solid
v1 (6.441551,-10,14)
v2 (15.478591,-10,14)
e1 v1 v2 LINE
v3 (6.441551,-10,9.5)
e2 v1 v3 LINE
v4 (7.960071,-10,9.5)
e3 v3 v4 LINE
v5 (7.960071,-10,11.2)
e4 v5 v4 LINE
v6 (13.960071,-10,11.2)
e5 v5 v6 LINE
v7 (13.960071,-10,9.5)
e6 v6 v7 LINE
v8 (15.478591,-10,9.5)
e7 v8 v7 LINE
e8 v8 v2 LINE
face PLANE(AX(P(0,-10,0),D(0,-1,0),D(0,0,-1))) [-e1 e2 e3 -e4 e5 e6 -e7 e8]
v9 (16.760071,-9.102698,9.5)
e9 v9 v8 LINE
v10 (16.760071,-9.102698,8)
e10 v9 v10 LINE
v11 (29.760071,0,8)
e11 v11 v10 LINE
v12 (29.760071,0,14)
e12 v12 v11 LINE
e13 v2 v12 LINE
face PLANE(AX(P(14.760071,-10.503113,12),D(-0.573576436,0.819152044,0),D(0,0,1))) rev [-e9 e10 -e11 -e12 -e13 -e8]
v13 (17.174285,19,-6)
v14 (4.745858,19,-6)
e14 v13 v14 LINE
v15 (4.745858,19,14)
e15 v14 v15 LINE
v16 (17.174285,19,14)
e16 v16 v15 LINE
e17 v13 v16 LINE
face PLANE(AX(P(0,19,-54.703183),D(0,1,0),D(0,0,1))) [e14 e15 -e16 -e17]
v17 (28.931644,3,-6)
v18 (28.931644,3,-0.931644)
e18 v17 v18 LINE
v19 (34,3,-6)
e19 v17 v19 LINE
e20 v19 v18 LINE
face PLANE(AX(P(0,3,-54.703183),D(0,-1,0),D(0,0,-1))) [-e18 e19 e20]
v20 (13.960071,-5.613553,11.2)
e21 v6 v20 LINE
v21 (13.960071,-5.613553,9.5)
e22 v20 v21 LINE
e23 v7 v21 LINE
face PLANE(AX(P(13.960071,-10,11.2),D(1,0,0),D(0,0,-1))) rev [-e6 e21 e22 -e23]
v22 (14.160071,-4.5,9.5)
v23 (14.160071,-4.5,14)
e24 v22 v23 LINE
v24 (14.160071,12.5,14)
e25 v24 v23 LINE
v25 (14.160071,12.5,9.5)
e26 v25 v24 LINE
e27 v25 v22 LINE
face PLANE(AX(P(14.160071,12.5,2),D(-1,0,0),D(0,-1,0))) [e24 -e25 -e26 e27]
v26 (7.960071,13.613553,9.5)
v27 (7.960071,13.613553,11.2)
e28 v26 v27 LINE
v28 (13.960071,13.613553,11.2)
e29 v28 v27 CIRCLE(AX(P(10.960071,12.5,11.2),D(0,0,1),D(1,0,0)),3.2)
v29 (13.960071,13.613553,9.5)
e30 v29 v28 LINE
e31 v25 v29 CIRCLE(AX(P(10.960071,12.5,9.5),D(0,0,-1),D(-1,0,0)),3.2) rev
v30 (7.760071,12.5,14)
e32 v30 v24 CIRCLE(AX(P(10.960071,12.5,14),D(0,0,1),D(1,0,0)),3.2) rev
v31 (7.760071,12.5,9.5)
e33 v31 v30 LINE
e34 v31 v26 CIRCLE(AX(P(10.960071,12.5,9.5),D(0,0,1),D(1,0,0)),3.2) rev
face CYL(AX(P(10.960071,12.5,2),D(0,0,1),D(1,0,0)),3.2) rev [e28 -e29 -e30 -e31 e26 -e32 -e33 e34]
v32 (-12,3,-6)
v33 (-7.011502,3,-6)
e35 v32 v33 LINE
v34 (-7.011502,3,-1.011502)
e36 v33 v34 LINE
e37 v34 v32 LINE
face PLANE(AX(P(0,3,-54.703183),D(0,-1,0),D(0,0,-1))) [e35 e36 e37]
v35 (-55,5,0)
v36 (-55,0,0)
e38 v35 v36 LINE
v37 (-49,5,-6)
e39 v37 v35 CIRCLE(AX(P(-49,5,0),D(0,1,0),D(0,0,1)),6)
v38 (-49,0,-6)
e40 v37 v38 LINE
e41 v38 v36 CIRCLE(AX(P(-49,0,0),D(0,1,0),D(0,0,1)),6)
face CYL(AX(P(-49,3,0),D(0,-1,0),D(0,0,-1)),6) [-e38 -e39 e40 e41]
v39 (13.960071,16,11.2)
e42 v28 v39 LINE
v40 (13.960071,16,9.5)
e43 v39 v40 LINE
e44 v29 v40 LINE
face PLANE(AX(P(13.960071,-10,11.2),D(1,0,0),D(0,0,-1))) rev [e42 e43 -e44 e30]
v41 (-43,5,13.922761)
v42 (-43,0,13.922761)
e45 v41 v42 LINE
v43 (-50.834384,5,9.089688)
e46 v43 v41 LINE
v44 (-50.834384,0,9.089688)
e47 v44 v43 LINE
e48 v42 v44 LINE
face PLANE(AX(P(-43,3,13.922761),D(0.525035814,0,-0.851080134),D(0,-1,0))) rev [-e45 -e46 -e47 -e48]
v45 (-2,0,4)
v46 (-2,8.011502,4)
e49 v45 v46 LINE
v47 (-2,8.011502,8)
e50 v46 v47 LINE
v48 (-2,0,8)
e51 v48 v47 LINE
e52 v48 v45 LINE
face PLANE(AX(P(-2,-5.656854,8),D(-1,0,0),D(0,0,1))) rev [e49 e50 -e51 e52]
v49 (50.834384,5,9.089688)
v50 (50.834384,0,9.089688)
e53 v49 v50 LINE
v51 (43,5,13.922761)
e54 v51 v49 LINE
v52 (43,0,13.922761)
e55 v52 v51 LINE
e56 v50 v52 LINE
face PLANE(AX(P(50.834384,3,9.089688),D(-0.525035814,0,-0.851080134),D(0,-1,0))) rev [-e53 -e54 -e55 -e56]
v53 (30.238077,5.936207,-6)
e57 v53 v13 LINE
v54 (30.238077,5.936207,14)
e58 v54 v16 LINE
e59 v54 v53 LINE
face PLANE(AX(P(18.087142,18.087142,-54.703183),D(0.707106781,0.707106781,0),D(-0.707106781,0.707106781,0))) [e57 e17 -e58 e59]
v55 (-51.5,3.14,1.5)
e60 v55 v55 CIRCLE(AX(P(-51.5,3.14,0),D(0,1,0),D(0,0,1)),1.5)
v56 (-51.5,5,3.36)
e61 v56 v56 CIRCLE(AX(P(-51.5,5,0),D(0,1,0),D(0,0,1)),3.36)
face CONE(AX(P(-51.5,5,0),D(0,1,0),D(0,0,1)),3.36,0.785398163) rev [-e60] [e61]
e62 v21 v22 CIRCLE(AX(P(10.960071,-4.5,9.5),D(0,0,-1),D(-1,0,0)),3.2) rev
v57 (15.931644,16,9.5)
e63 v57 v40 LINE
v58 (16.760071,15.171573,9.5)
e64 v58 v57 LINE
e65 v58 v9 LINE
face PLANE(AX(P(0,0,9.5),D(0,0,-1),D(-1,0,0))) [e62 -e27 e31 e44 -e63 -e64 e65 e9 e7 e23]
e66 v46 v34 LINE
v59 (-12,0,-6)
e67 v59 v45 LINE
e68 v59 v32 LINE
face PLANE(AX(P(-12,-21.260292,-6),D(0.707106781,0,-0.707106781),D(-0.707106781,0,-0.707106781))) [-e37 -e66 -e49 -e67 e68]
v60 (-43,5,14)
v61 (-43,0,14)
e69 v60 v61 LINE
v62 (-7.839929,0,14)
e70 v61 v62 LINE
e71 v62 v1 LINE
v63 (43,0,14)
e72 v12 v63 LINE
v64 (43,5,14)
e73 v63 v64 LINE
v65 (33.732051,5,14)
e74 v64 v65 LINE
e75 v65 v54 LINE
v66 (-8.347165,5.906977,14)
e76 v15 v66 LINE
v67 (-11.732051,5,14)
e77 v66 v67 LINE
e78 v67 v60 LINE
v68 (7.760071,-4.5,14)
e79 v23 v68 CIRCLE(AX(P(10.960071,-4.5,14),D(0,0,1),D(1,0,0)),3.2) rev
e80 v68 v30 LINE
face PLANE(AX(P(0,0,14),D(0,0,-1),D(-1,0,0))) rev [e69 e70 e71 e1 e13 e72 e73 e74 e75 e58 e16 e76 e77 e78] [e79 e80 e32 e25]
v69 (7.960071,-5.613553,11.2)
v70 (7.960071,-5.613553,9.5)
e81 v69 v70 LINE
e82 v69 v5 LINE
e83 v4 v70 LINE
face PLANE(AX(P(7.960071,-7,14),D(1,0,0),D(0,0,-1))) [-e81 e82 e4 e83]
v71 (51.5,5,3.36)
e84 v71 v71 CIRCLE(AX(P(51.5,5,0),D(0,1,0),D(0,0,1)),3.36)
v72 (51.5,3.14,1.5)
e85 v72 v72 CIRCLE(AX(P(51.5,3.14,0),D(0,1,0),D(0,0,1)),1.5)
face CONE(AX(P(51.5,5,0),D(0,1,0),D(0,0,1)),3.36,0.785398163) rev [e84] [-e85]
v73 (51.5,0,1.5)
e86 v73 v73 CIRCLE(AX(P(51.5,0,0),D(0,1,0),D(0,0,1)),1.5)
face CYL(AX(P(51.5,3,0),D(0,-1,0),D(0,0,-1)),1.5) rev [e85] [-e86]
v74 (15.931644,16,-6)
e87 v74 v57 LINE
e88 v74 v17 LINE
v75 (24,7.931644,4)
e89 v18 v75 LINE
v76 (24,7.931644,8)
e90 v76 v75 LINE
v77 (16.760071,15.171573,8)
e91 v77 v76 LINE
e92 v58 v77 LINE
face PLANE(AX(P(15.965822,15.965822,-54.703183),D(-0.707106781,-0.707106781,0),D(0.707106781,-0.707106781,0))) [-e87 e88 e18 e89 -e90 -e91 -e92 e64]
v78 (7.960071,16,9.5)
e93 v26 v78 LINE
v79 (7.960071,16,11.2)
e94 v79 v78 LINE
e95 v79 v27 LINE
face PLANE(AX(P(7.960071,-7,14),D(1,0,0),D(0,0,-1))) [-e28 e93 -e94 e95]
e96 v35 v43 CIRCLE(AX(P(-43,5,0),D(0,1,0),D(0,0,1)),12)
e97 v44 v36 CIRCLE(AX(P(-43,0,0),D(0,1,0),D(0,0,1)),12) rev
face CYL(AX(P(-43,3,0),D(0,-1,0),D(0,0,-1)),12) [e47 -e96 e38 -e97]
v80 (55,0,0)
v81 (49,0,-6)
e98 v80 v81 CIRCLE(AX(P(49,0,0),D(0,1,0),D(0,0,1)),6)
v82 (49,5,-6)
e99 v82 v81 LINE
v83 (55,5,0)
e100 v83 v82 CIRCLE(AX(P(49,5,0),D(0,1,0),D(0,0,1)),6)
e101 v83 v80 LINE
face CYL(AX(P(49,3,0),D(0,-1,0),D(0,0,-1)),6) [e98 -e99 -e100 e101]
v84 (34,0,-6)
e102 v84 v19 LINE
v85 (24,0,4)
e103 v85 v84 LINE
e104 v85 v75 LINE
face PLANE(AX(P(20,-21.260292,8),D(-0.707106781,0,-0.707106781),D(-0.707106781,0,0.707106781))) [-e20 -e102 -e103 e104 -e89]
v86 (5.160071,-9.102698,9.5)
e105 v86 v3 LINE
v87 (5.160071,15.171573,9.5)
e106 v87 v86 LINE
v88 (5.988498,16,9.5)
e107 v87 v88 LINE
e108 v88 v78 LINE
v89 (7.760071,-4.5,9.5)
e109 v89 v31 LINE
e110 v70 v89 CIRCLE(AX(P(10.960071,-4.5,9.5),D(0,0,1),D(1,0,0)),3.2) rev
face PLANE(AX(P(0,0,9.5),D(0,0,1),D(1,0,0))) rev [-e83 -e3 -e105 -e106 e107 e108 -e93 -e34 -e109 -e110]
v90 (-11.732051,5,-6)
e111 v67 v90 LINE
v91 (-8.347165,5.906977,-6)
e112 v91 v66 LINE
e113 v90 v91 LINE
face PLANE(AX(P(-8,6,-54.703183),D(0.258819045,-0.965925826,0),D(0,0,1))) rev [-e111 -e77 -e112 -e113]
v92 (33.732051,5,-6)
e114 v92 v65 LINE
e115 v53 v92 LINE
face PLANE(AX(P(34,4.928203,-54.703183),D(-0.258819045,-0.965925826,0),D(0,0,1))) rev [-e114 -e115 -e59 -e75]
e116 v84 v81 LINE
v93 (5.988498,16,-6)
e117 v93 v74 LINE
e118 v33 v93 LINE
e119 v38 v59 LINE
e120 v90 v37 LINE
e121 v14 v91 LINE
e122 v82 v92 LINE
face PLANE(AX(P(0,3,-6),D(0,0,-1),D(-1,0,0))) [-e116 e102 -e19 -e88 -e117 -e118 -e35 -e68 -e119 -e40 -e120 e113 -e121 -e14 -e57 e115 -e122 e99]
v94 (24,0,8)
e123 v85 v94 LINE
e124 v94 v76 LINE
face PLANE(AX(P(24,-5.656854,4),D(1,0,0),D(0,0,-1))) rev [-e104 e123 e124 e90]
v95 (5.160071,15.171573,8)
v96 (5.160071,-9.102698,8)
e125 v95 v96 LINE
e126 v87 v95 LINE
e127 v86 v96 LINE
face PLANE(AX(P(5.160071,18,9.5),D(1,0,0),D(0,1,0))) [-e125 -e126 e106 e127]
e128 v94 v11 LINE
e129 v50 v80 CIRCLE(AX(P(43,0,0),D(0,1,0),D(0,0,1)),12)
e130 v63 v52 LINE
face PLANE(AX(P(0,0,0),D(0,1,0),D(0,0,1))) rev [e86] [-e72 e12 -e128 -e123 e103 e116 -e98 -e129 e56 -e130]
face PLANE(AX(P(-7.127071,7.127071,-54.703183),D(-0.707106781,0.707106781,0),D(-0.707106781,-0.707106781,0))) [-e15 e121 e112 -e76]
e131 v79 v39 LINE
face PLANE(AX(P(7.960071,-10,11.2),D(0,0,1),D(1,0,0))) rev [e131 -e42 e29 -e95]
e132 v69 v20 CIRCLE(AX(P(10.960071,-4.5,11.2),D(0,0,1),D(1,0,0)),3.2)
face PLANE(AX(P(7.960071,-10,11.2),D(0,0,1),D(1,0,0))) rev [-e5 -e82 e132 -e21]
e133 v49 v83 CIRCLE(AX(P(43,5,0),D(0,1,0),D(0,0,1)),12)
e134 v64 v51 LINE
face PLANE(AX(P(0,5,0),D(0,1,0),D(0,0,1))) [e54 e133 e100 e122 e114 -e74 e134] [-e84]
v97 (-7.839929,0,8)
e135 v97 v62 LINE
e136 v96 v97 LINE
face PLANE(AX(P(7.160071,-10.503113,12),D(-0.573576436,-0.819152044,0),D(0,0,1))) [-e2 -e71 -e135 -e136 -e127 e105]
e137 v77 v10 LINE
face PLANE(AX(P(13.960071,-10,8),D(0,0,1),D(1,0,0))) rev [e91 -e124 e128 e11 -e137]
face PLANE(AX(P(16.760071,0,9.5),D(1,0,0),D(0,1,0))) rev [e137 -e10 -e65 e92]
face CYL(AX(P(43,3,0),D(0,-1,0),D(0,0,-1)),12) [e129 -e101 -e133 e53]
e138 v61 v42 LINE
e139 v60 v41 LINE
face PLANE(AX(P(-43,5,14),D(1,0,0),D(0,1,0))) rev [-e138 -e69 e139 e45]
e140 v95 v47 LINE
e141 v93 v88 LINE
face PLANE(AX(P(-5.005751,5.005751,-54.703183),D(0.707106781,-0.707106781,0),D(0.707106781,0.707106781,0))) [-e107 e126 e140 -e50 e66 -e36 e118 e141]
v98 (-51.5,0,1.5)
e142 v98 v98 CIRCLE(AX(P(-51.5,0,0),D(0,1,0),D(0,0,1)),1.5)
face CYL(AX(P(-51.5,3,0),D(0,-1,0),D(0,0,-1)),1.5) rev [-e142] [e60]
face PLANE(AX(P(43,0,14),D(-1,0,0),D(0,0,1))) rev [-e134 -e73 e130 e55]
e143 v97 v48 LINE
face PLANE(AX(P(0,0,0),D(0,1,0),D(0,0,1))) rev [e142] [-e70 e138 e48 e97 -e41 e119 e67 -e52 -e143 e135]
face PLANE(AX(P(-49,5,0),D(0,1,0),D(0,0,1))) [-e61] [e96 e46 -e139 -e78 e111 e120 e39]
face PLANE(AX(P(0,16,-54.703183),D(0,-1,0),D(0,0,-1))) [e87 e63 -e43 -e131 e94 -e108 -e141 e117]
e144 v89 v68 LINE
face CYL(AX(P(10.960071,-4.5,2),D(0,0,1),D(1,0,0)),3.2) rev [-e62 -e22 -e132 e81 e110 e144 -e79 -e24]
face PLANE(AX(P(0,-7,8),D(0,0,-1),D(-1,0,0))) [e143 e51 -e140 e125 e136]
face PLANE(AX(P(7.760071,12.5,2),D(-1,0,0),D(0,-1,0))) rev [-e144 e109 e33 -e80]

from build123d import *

# Parameters (mm, degrees)
BOSS_EXTRUDE1_DEPTH           = 3
CUT_EXTRUDE1_DEPTH            = 10
CUT_EXTRUDE3_START            = 8
SKETCH8_W                     = 6
SKETCH8_H                     = 3
CUT_EXTRUDE3_DEPTH            = 6
BOSS_EXTRUDE4_START           = 18
BOSS_EXTRUDE4_DEPTH           = 28
BOSS_EXTRUDE5_DEPTH           = 3
CUT_EXTRUDE4_DEPTH            = 3
CUT_EXTRUDE5_DEPTH            = 10
SKETCH18_R                    = 1.5
BOSS_EXTRUDE9_DEPTH           = 2
CHAMFER1_SIZE                 = 15
CHAMFER2_SIZE                 = 15
CHAMFER2_SIZE_2               = 10.503113073
CUT_EXTRUDE6_DEPTH            = 5
BOSS_EXTRUDE8_DEPTH           = 2
CHAMFER3_DEPTH                = 6
CHAMFER3_2_DEPTH              = 5
CSK_FOR_M3_SFHCS1_D           = 3
CSK_FOR_M3_SFHCS1_DEPTH       = 31.098709071
CSK_FOR_M3_SFHCS1_CSINK_D     = 6.72
CSK_FOR_M3_SFHCS1_CSINK_ANGLE = 90
CSK_FOR_M3_SFHCS1_TIP         = 0.901290929
CUT_EXTRUDE7_DEPTH            = 1.5
BOSS_EXTRUDE10_START          = -6
BOSS_EXTRUDE10_DEPTH          = 20
CHAMFER4_SIZE                 = 1.07179677
CHAMFER4_SIZE_2               = 4


with BuildPart() as part:
    # Sketch1 → Boss-Extrude1 (new body)
    with BuildSketch(Plane(origin=(0, 0, 0), x_dir=(1, 0, 0), z_dir=(0, 1, 0))):
        with BuildLine():
            ThreePointArc((-49, -6), (-53.242640687, -4.242640687), (-55, 0))
            ThreePointArc((-55, 0), (-51.485281374, -8.485281374), (-43, -12))
            Line((-43, -12), (43, -12))
            ThreePointArc((43, -12), (51.485281374, -8.485281374), (55, 0))
            ThreePointArc((55, 0), (53.242640687, -4.242640687), (49, -6))
            Line((49, -6), (-49, -6))
        make_face()
        with BuildLine():
            Line((-53, 0), (-55, 0))
            ThreePointArc((-55, 0), (-53.242640687, -4.242640687), (-49, -6))
            Line((-49, -6), (49, -6))
            ThreePointArc((49, -6), (53.242640687, -4.242640687), (55, 0))
            Line((55, 0), (53, 0))
            ThreePointArc((53, 0), (51.5, -1.5), (50, 0))
            Line((50, 0), (-50, 0))
            ThreePointArc((-50, 0), (-51.5, -1.5), (-53, 0))
        make_face()
        with BuildLine():
            Line((49, 6), (-49, 6))
            ThreePointArc((-49, 6), (-53.242640687, 4.242640687), (-55, 0))
            Line((-55, 0), (-53, 0))
            ThreePointArc((-53, 0), (-51.5, 1.5), (-50, 0))
            Line((-50, 0), (50, 0))
            ThreePointArc((50, 0), (51.5, 1.5), (53, 0))
            Line((53, 0), (55, 0))
            ThreePointArc((55, 0), (53.242640687, 4.242640687), (49, 6))
        make_face()
    extrude(amount=BOSS_EXTRUDE1_DEPTH)

    # Sketch2 → Cut-Extrude1 (cut)
    with BuildSketch(Plane(origin=(0, 3, 0), x_dir=(1, 0, 0), z_dir=(0, 1, 0))):
        Polygon((22, -8), (36, 6), (-14, 6), (0, -8), align=None)
    extrude(amount=-CUT_EXTRUDE1_DEPTH, mode=Mode.SUBTRACT)

    # Sketch8 → Cut-Extrude3 (cut)
    with BuildSketch(Plane.XY.offset(CUT_EXTRUDE3_START)):
        with Locations((10.960071178, 1.5)):
            Rectangle(SKETCH8_W, SKETCH8_H)
    extrude(amount=CUT_EXTRUDE3_DEPTH, mode=Mode.SUBTRACT)


with BuildPart() as cut_extrude3_piece_1:
    # of the separate pieces the step leaves, piece 1, a body of its own (cut_extrude3_pieces)
    add(part.part.solids().sort_by_distance((-55, 0, 0))[0])

    # Sketch9 → Boss-Extrude4 (add)
    with BuildSketch(Plane(origin=(0, 0, 0), x_dir=(1, 0, 0), z_dir=(0, 1, 0)).offset(BOSS_EXTRUDE4_START)):
        Polygon((13.960071178, -11.2), (13.960071178, -8), (14.760071178, -8), (14.760071178, -12), (7.160071178, -12), (7.160071178, -8), (7.960071178, -8), (7.960071178, -11.2), align=None)
    extrude(amount=-BOSS_EXTRUDE4_DEPTH)


with BuildPart() as cut_extrude3_piece_2:
    # of the separate pieces the step leaves, piece 2, a body of its own (cut_extrude3_pieces)
    add(part.part.solids().sort_by_distance((13.960071178, 0, 12))[0])


with BuildPart() as cut_extrude3_piece_1_1:
    add(cut_extrude3_piece_1.part)

    # Combine1: union Cut-Extrude3 piece 2
    add(cut_extrude3_piece_2.part)

    # Sketch11 → Boss-Extrude5 (add)
    with BuildSketch(Plane(origin=(0, 3, 0), x_dir=(1, 0, 0), z_dir=(0, 1, 0))):
        Polygon((-14, 6), (-12, 6), (2, -8), (0, -8), align=None)
        Polygon((20, -8), (34, 6), (36, 6), (22, -8), align=None)
    extrude(amount=-BOSS_EXTRUDE5_DEPTH)

    # Sketch13 → Cut-Extrude4 (cut)
    with BuildSketch(Plane(origin=(0, 3, 0), x_dir=(1, 0, 0), z_dir=(0, 1, 0))):
        Polygon((2, -8), (-2, -8), (-2, -4), align=None)
        Polygon((24, -4), (24, -8), (20, -8), align=None)
    extrude(amount=-CUT_EXTRUDE4_DEPTH, mode=Mode.SUBTRACT)

    # Sketch15 → Cut-Extrude5 (cut)
    with BuildSketch(Plane.XY.offset(12)):
        with BuildLine():
            Line((14.160071178, 12.5), (14.160071178, -4.5))
            ThreePointArc((14.160071178, -4.5), (10.960071178, -7.7), (7.760071178, -4.5))
            Line((7.760071178, -4.5), (7.760071178, 12.5))
            ThreePointArc((7.760071178, 12.5), (10.960071178, 15.7), (14.160071178, 12.5))
        make_face()
    extrude(amount=-CUT_EXTRUDE5_DEPTH, mode=Mode.SUBTRACT)

    # Sketch18 → Boss-Extrude9 (add)
    # profile 1 of 2: a face of its own
    with BuildSketch(Plane(origin=(0, 3, 0), x_dir=(1, 0, 0), z_dir=(0, 1, 0))):
        with BuildLine():
            Line((7.160071178, -8), (-2, -8))
            Line((-2, -8), (-2, -4))
            Line((-2, -4), (-12, 6))
            Line((-12, 6), (-49, 6))
            ThreePointArc((-49, 6), (-53.242640687, 4.242640687), (-55, 0))
            ThreePointArc((-55, 0), (-51.485281374, -8.485281374), (-43, -12))
            Line((-43, -12), (7.160071178, -12))
            Line((7.160071178, -12), (7.160071178, -8))
        make_face()
        with Locations(Location((-51.5, 0, 0), (0, 0, 270))):
            Circle(SKETCH18_R, mode=Mode.SUBTRACT)
    # profile 2 of 2: a face of its own
    with BuildSketch(Plane(origin=(0, 3, 0), x_dir=(1, 0, 0), z_dir=(0, 1, 0))):
        with BuildLine():
            Line((24, -4), (24, -8))
            Line((24, -8), (14.760071178, -8))
            Line((14.760071178, -8), (14.760071178, -12))
            Line((14.760071178, -12), (43, -12))
            ThreePointArc((43, -12), (51.485281374, -8.485281374), (55, 0))
            ThreePointArc((55, 0), (53.242640687, 4.242640687), (49, 6))
            Line((49, 6), (34, 6))
            Line((34, 6), (24, -4))
        make_face()
        with Locations(Location((51.5, 0, 0), (0, 0, 270))):
            Circle(SKETCH18_R, mode=Mode.SUBTRACT)
    extrude(amount=BOSS_EXTRUDE9_DEPTH)

    # Chamfer1
    # the kernel refuses this chamfer: 15 mm, written as the material it adds along each edge
    with BuildSketch(Plane(origin=(14.760071178, 5, 8), x_dir=(0, 1, 0), z_dir=(0, 0, 1))) as chamfer1_piece_1_section:
        Polygon((CHAMFER1_SIZE, 0), (0, -CHAMFER1_SIZE), (0, 0), align=None)
    chamfer1_piece_1 = extrude(amount=4, mode=Mode.PRIVATE)
    chamfer1_piece_1 = split(chamfer1_piece_1, bisect_by=Plane(origin=(14.760071178, 18, 8), z_dir=(0, -1, 0)), keep=Keep.TOP, mode=Mode.PRIVATE)
    chamfer1_piece_1 = split(chamfer1_piece_1, bisect_by=Plane(origin=(17.380035589, 5, 10.619964411), z_dir=(-0.7071067811865474, 0, -0.7071067811865477)), keep=Keep.TOP, mode=Mode.PRIVATE)
    add(chamfer1_piece_1)
    with BuildSketch(Plane(origin=(14.760071178, 5, -30.575244819), x_dir=(0, 1, 0), z_dir=(0, 0, 1))) as chamfer1_piece_2_section:
        Polygon((CHAMFER1_SIZE, 0), (0, -CHAMFER1_SIZE), (0, 0), align=None)
    chamfer1_piece_2 = extrude(amount=42.575244819, mode=Mode.PRIVATE)
    chamfer1_piece_2 = split(chamfer1_piece_2, bisect_by=Plane(origin=(14.760071178, 5, 8), z_dir=(0, 0, -1)), keep=Keep.TOP, mode=Mode.PRIVATE)
    chamfer1_piece_2 = split(chamfer1_piece_2, bisect_by=Plane(origin=(36.667657999, 5, -8.667657999), z_dir=(0.7071067811865474, 0, 0.7071067811865477)), keep=Keep.TOP, mode=Mode.PRIVATE)
    chamfer1_piece_2 = split(chamfer1_piece_2, bisect_by=Plane(origin=(24, 5, -30.575244819), z_dir=(1, 0, 0)), keep=Keep.TOP, mode=Mode.PRIVATE)
    add(chamfer1_piece_2)
    with BuildSketch(Plane(origin=(14.760071178, 5, 8), x_dir=(0, 1, 0), z_dir=(0, 0, 1))) as chamfer1_piece_3_section:
        Polygon((CHAMFER1_SIZE, 0), (0, -CHAMFER1_SIZE), (0, 0), align=None)
    chamfer1_piece_3 = extrude(amount=4, mode=Mode.PRIVATE)
    chamfer1_piece_3 = split(chamfer1_piece_3, bisect_by=Plane(origin=(14.760071178, 18, 8), z_dir=(0, -1, 0)), keep=Keep.TOP, mode=Mode.PRIVATE)
    chamfer1_piece_3 = split(chamfer1_piece_3, bisect_by=Plane(origin=(17.380035589, 5, 10.619964411), z_dir=(0.7071067811865474, 0, 0.7071067811865477)), keep=Keep.TOP, mode=Mode.PRIVATE)
    chamfer1_piece_3 = split(chamfer1_piece_3, bisect_by=Plane(origin=(24, 5, 8), z_dir=(-1, 0, 0)), keep=Keep.TOP, mode=Mode.PRIVATE)
    add(chamfer1_piece_3)
    with BuildSketch(Plane(origin=(14.760071178, 5, 8), x_dir=(0, 1, 0), z_dir=(0, 0, 1))) as chamfer1_piece_4_section:
        Polygon((CHAMFER1_SIZE, 0), (0, -CHAMFER1_SIZE), (0, 0), align=None)
    chamfer1_piece_4 = extrude(amount=4, mode=Mode.PRIVATE)
    chamfer1_piece_4 = split(chamfer1_piece_4, bisect_by=Plane(origin=(24, 5, 8), z_dir=(1, 0, 0)), keep=Keep.TOP, mode=Mode.PRIVATE)
    add(chamfer1_piece_4)
    with BuildSketch(Plane(origin=(7.160071178, 5, 12), x_dir=(0, 1, 0), z_dir=(0, 0, -1))) as chamfer1_piece_5_section:
        Polygon((CHAMFER1_SIZE, 0), (0, -CHAMFER1_SIZE), (0, 0), align=None)
    chamfer1_piece_5 = extrude(amount=4, mode=Mode.PRIVATE)
    chamfer1_piece_5 = split(chamfer1_piece_5, bisect_by=Plane(origin=(6.580035589, 5, 12.580035589), z_dir=(-0.7071067811865489, 0, 0.7071067811865461)), keep=Keep.TOP, mode=Mode.PRIVATE)
    chamfer1_piece_5 = split(chamfer1_piece_5, bisect_by=Plane(origin=(-2, 5, 12), z_dir=(1, 0, 0)), keep=Keep.TOP, mode=Mode.PRIVATE)
    chamfer1_piece_5 = split(chamfer1_piece_5, bisect_by=Plane(origin=(7.160071178, 18, 12), z_dir=(0, -1, 0)), keep=Keep.TOP, mode=Mode.PRIVATE)
    add(chamfer1_piece_5)
    with BuildSketch(Plane(origin=(7.160071178, 5, 12), x_dir=(0, 1, 0), z_dir=(0, 0, -1))) as chamfer1_piece_6_section:
        Polygon((CHAMFER1_SIZE, 0), (0, -CHAMFER1_SIZE), (0, 0), align=None)
    chamfer1_piece_6 = extrude(amount=4, mode=Mode.PRIVATE)
    chamfer1_piece_6 = split(chamfer1_piece_6, bisect_by=Plane(origin=(-2, 5, 12), z_dir=(-1, 0, 0)), keep=Keep.TOP, mode=Mode.PRIVATE)
    add(chamfer1_piece_6)
    with BuildSketch(Plane(origin=(7.160071178, 5, 12), x_dir=(0, 1, 0), z_dir=(0, 0, -1))) as chamfer1_piece_7_section:
        Polygon((CHAMFER1_SIZE, 0), (0, -CHAMFER1_SIZE), (0, 0), align=None)
    chamfer1_piece_7 = extrude(amount=4, mode=Mode.PRIVATE)
    chamfer1_piece_7 = split(chamfer1_piece_7, bisect_by=Plane(origin=(6.580035589, 5, 12.580035589), z_dir=(0.7071067811865489, 0, -0.7071067811865461)), keep=Keep.TOP, mode=Mode.PRIVATE)
    chamfer1_piece_7 = split(chamfer1_piece_7, bisect_by=Plane(origin=(7.160071178, 18, 12), z_dir=(0, -1, 0)), keep=Keep.TOP, mode=Mode.PRIVATE)
    add(chamfer1_piece_7)
    with BuildSketch(Plane(origin=(7.160071178, 5, 12), x_dir=(0, 1, 0), z_dir=(0, 0, -1))) as chamfer1_piece_8_section:
        Polygon((CHAMFER1_SIZE, 0), (0, -CHAMFER1_SIZE), (0, 0), align=None)
    chamfer1_piece_8 = extrude(amount=42.575244819, mode=Mode.PRIVATE)
    chamfer1_piece_8 = split(chamfer1_piece_8, bisect_by=Plane(origin=(6.580035589, 5, 12.580035589), z_dir=(-0.7071067811865489, 0, 0.7071067811865461)), keep=Keep.TOP, mode=Mode.PRIVATE)
    chamfer1_piece_8 = split(chamfer1_piece_8, bisect_by=Plane(origin=(-2, 5, 12), z_dir=(-1, 0, 0)), keep=Keep.TOP, mode=Mode.PRIVATE)
    chamfer1_piece_8 = split(chamfer1_piece_8, bisect_by=Plane(origin=(7.160071178, 5, 8), z_dir=(0, 0, -1)), keep=Keep.TOP, mode=Mode.PRIVATE)
    add(chamfer1_piece_8)

    # Chamfer2
    # the kernel refuses this chamfer: 15, 10.503113073 mm, written as the material it adds along each edge
    with BuildSketch(Plane(origin=(7.160071178, 0, 12), x_dir=(-1, 0, 0), z_dir=(0, 0, -1))) as chamfer2_piece_1_section:
        Polygon((CHAMFER2_SIZE, 0), (0, -CHAMFER2_SIZE_2), (0, 0), align=None)
    chamfer2_piece_1 = extrude(amount=4, mode=Mode.PRIVATE)
    chamfer2_piece_1 = split(chamfer2_piece_1, bisect_by=Plane(origin=(-2, 0, 12), z_dir=(-1, 0, 0)), keep=Keep.TOP, mode=Mode.PRIVATE)
    add(chamfer2_piece_1)
    with BuildSketch(Plane(origin=(7.160071178, 0, 12), x_dir=(-1, 0, 0), z_dir=(0, 0, -1))) as chamfer2_piece_2_section:
        Polygon((CHAMFER2_SIZE, 0), (0, -CHAMFER2_SIZE_2), (0, 0), align=None)
    chamfer2_piece_2 = extrude(amount=4, mode=Mode.PRIVATE)
    chamfer2_piece_2 = split(chamfer2_piece_2, bisect_by=Plane(origin=(6.580035589, 0, 12.580035589), z_dir=(-0.7071067811865476, 0, 0.7071067811865476)), keep=Keep.TOP, mode=Mode.PRIVATE)
    chamfer2_piece_2 = split(chamfer2_piece_2, bisect_by=Plane(origin=(-2, 0, 12), z_dir=(1, 0, 0)), keep=Keep.TOP, mode=Mode.PRIVATE)
    add(chamfer2_piece_2)
    with BuildSketch(Plane(origin=(7.160071178, 0, 12), x_dir=(-1, 0, 0), z_dir=(0, 0, -1))) as chamfer2_piece_3_section:
        Polygon((CHAMFER2_SIZE, 0), (0, -CHAMFER2_SIZE_2), (0, 0), align=None)
    chamfer2_piece_3 = extrude(amount=42.738283454, mode=Mode.PRIVATE)
    chamfer2_piece_3 = split(chamfer2_piece_3, bisect_by=Plane(origin=(6.580035589, 0, 12.580035589), z_dir=(-0.7071067811865476, 0, 0.7071067811865476)), keep=Keep.TOP, mode=Mode.PRIVATE)
    chamfer2_piece_3 = split(chamfer2_piece_3, bisect_by=Plane(origin=(7.160071178, 0, 8), z_dir=(0, 0, -1)), keep=Keep.TOP, mode=Mode.PRIVATE)
    chamfer2_piece_3 = split(chamfer2_piece_3, bisect_by=Plane(origin=(-2, 0, 12), z_dir=(-1, 0, 0)), keep=Keep.TOP, mode=Mode.PRIVATE)
    add(chamfer2_piece_3)
    with BuildSketch(Plane(origin=(7.160071178, 0, 12), x_dir=(-1, 0, 0), z_dir=(0, 0, -1))) as chamfer2_piece_4_section:
        Polygon((CHAMFER2_SIZE, 0), (0, -CHAMFER2_SIZE_2), (0, 0), align=None)
    chamfer2_piece_4 = extrude(amount=4, mode=Mode.PRIVATE)
    chamfer2_piece_4 = split(chamfer2_piece_4, bisect_by=Plane(origin=(6.580035589, 0, 12.580035589), z_dir=(0.7071067811865476, 0, -0.7071067811865476)), keep=Keep.TOP, mode=Mode.PRIVATE)
    chamfer2_piece_4 = split(chamfer2_piece_4, bisect_by=Plane(origin=(7.160071178, -10, 12), z_dir=(0, 1, 0)), keep=Keep.TOP, mode=Mode.PRIVATE)
    add(chamfer2_piece_4)
    with BuildSketch(Plane(origin=(14.760071178, 0, 12), x_dir=(0, -1, 0), z_dir=(0, 0, -1))) as chamfer2_piece_5_section:
        Polygon((CHAMFER2_SIZE_2, 0), (0, -CHAMFER2_SIZE), (0, 0), align=None)
    chamfer2_piece_5 = extrude(amount=4, mode=Mode.PRIVATE)
    chamfer2_piece_5 = split(chamfer2_piece_5, bisect_by=Plane(origin=(15.380035589, 0, 12.619964411), z_dir=(0.7071067811865476, 0, 0.7071067811865476)), keep=Keep.TOP, mode=Mode.PRIVATE)
    chamfer2_piece_5 = split(chamfer2_piece_5, bisect_by=Plane(origin=(24, 0, 12), z_dir=(-1, 0, 0)), keep=Keep.TOP, mode=Mode.PRIVATE)
    add(chamfer2_piece_5)
    with BuildSketch(Plane(origin=(14.760071178, 0, 12), x_dir=(0, -1, 0), z_dir=(0, 0, -1))) as chamfer2_piece_6_section:
        Polygon((CHAMFER2_SIZE_2, 0), (0, -CHAMFER2_SIZE), (0, 0), align=None)
    chamfer2_piece_6 = extrude(amount=4, mode=Mode.PRIVATE)
    chamfer2_piece_6 = split(chamfer2_piece_6, bisect_by=Plane(origin=(24, 0, 12), z_dir=(1, 0, 0)), keep=Keep.TOP, mode=Mode.PRIVATE)
    add(chamfer2_piece_6)
    with BuildSketch(Plane(origin=(14.760071178, 0, 12), x_dir=(0, -1, 0), z_dir=(0, 0, -1))) as chamfer2_piece_7_section:
        Polygon((CHAMFER2_SIZE_2, 0), (0, -CHAMFER2_SIZE), (0, 0), align=None)
    chamfer2_piece_7 = extrude(amount=4, mode=Mode.PRIVATE)
    chamfer2_piece_7 = split(chamfer2_piece_7, bisect_by=Plane(origin=(14.760071178, -10, 12), z_dir=(0, 1, 0)), keep=Keep.TOP, mode=Mode.PRIVATE)
    chamfer2_piece_7 = split(chamfer2_piece_7, bisect_by=Plane(origin=(15.380035589, 0, 12.619964411), z_dir=(-0.7071067811865476, 0, -0.7071067811865476)), keep=Keep.TOP, mode=Mode.PRIVATE)
    add(chamfer2_piece_7)
    with BuildSketch(Plane(origin=(14.760071178, 0, 12), x_dir=(0, -1, 0), z_dir=(0, 0, -1))) as chamfer2_piece_8_section:
        Polygon((CHAMFER2_SIZE_2, 0), (0, -CHAMFER2_SIZE), (0, 0), align=None)
    chamfer2_piece_8 = extrude(amount=42.738283454, mode=Mode.PRIVATE)
    chamfer2_piece_8 = split(chamfer2_piece_8, bisect_by=Plane(origin=(14.760071178, 0, 8), z_dir=(0, 0, -1)), keep=Keep.TOP, mode=Mode.PRIVATE)
    chamfer2_piece_8 = split(chamfer2_piece_8, bisect_by=Plane(origin=(15.380035589, 0, 12.619964411), z_dir=(0.7071067811865476, 0, 0.7071067811865476)), keep=Keep.TOP, mode=Mode.PRIVATE)
    chamfer2_piece_8 = split(chamfer2_piece_8, bisect_by=Plane(origin=(24, 0, 12), z_dir=(1, 0, 0)), keep=Keep.TOP, mode=Mode.PRIVATE)
    add(chamfer2_piece_8)

    # Sketch16 → Cut-Extrude6 (cut)
    with BuildSketch(Plane(origin=(0, 0, 0), x_dir=(1, 0, 0), z_dir=(0, 1, 0))):
        Polygon((-7.839928822, 1.839928822), (-2, -4), (-2, -8), (-7.839928822, -8), align=None)
        Polygon((24, -8), (24, -4), (29.760071178, 1.760071178), (29.760071178, -8), align=None)
    extrude(amount=-CUT_EXTRUDE6_DEPTH, mode=Mode.SUBTRACT)

    # Sketch17 → Boss-Extrude8 (add)
    with BuildSketch(Plane.XY.offset(12)):
        Polygon((-7.839928822, 0), (6.441551245, -10), (15.47859111, -10), (29.760071178, 0), (43, 0), (43, 5), (29.760071178, 5), (16.760071178, 18), (5.160071178, 18), (-7.839928822, 5), (-43, 5), (-43, 0), align=None)
        with BuildLine():
            Line((7.760071178, -4.5), (7.760071178, 12.5))
            ThreePointArc((7.760071178, 12.5), (10.960071178, 15.7), (14.160071178, 12.5))
            Line((14.160071178, 12.5), (14.160071178, -4.5))
            ThreePointArc((14.160071178, -4.5), (10.960071178, -7.7), (7.760071178, -4.5))
        make_face(mode=Mode.SUBTRACT)
    extrude(amount=BOSS_EXTRUDE8_DEPTH)

    # Chamfer3: read off the stored shape, not the designer's step
    # Chamfer3 outline → Chamfer3 (cut)
    with BuildSketch(Plane(origin=(0, 0, 0), x_dir=(1, 0, 0), z_dir=(0, 1, 0))):
        with BuildLine():
            ThreePointArc((47.608318931, -11.079864468), (49.300429772, -10.212961602), (50.834384089, -9.08968789))
            Line((50.834384089, -9.08968789), (47.608318931, -11.079864468))
        make_face()
        with BuildLine():
            ThreePointArc((-50.834384089, -9.08968789), (-49.300429772, -10.212961602), (-47.608318931, -11.079864468))
            Line((-47.608318931, -11.079864468), (-50.834384089, -9.08968789))
        make_face()
    extrude(amount=CHAMFER3_DEPTH, mode=Mode.SUBTRACT)

    # Chamfer3 2 outline → Chamfer3 2 (add)
    with BuildSketch(Plane(origin=(0, 0, 0), x_dir=(1, 0, 0), z_dir=(0, 1, 0))):
        with BuildLine():
            Line((43, -13.922760673), (47.608318931, -11.079864468))
            ThreePointArc((47.608318931, -11.079864468), (45.349641077, -11.767717995), (43, -12))
            Line((43, -12), (43, -13.922760673))
        make_face()
        with BuildLine():
            Line((-47.608318931, -11.079864468), (-43, -13.922760673))
            Line((-43, -13.922760673), (-43, -12))
            ThreePointArc((-43, -12), (-45.349641077, -11.767717995), (-47.608318931, -11.079864468))
        make_face()
    extrude(amount=CHAMFER3_2_DEPTH)

    # CSK for M3 SFHCS1
    with Locations(Plane(origin=(0, 5, 0), x_dir=(1, 0, 0), z_dir=(0, 1, 0))):
        with Locations((-51.5, 0), (51.5, 0)):
            CounterSinkHole(CSK_FOR_M3_SFHCS1_D / 2, CSK_FOR_M3_SFHCS1_CSINK_D / 2, depth=CSK_FOR_M3_SFHCS1_DEPTH, counter_sink_angle=CSK_FOR_M3_SFHCS1_CSINK_ANGLE)
            with Locations((0, 0, -(CSK_FOR_M3_SFHCS1_DEPTH + CSK_FOR_M3_SFHCS1_TIP / 2))):  # 118° drill point
                Cone(0, CSK_FOR_M3_SFHCS1_D / 2, CSK_FOR_M3_SFHCS1_TIP, mode=Mode.SUBTRACT)

    # Sketch21 → Cut-Extrude7 (cut)
    with BuildSketch(Plane(origin=(0, 0, 8), x_dir=(-1, 0, 0), z_dir=(0, 0, -1))):
        Polygon((-13.960071178, -10), (-13.960071178, 18), (-16.760071178, 18), (-16.760071178, -9.102697997), (-15.47859111, -10), align=None)
        Polygon((-7.960071178, -10), (-7.960071178, 18), (-5.160071178, 18), (-5.160071178, -9.102697997), (-6.441551245, -10), align=None)
    extrude(amount=-CUT_EXTRUDE7_DEPTH, mode=Mode.SUBTRACT)

    # Sketch22 → Boss-Extrude10 (add)
    with BuildSketch(Plane.XY.offset(BOSS_EXTRUDE10_START)):
        Polygon((34, 3), (28.931644053, 3), (15.931644053, 16), (5.988498302, 16), (-7.011501698, 3), (-12, 3), (-12, 6), (-8.254142385, 6), (4.745857615, 19), (17.17428474, 19), (30.17428474, 6), (34, 6), align=None)
    extrude(amount=BOSS_EXTRUDE10_DEPTH)

    # Chamfer4
    # the kernel refuses this chamfer: 4, 1.07179677 mm, written as the material it takes off along each edge
    with BuildSketch(Plane(origin=(-12, 6, -16.386886281), x_dir=(0, -1, 0), z_dir=(0, 0, 1))) as chamfer4_piece_1_section:
        Polygon((CHAMFER4_SIZE, 0), (0, CHAMFER4_SIZE_2), (0, 0), align=None)
    chamfer4_piece_1 = extrude(amount=40.773772562, mode=Mode.PRIVATE)
    chamfer4_piece_1 = split(chamfer4_piece_1, bisect_by=Plane(origin=(-12, 5, -16.386886281), z_dir=(0, 1, 0)), keep=Keep.TOP, mode=Mode.PRIVATE)
    chamfer4_piece_1 = split(chamfer4_piece_1, bisect_by=Plane(origin=(-10.127071192, 4.127071192, -16.386886281), z_dir=(-0.707106781186548, 0.7071067811865472, 0)), keep=Keep.TOP, mode=Mode.PRIVATE)
    add(chamfer4_piece_1, mode=Mode.SUBTRACT)
    with BuildSketch(Plane(origin=(34, 6, -16.386886281), x_dir=(-1, 0, 0), z_dir=(0, 0, 1))) as chamfer4_piece_2_section:
        Polygon((CHAMFER4_SIZE_2, 0), (0, CHAMFER4_SIZE), (0, 0), align=None)
    chamfer4_piece_2 = extrude(amount=40.773772562, mode=Mode.PRIVATE)
    chamfer4_piece_2 = split(chamfer4_piece_2, bisect_by=Plane(origin=(34, 5, -16.386886281), z_dir=(0, 1, 0)), keep=Keep.TOP, mode=Mode.PRIVATE)
    chamfer4_piece_2 = split(chamfer4_piece_2, bisect_by=Plane(origin=(32.08714237, 4.08714237, -16.386886281), z_dir=(0.7071067811865475, 0.7071067811865476, 0)), keep=Keep.TOP, mode=Mode.PRIVATE)
    add(chamfer4_piece_2, mode=Mode.SUBTRACT)


solid = cut_extrude3_piece_1_1.part
